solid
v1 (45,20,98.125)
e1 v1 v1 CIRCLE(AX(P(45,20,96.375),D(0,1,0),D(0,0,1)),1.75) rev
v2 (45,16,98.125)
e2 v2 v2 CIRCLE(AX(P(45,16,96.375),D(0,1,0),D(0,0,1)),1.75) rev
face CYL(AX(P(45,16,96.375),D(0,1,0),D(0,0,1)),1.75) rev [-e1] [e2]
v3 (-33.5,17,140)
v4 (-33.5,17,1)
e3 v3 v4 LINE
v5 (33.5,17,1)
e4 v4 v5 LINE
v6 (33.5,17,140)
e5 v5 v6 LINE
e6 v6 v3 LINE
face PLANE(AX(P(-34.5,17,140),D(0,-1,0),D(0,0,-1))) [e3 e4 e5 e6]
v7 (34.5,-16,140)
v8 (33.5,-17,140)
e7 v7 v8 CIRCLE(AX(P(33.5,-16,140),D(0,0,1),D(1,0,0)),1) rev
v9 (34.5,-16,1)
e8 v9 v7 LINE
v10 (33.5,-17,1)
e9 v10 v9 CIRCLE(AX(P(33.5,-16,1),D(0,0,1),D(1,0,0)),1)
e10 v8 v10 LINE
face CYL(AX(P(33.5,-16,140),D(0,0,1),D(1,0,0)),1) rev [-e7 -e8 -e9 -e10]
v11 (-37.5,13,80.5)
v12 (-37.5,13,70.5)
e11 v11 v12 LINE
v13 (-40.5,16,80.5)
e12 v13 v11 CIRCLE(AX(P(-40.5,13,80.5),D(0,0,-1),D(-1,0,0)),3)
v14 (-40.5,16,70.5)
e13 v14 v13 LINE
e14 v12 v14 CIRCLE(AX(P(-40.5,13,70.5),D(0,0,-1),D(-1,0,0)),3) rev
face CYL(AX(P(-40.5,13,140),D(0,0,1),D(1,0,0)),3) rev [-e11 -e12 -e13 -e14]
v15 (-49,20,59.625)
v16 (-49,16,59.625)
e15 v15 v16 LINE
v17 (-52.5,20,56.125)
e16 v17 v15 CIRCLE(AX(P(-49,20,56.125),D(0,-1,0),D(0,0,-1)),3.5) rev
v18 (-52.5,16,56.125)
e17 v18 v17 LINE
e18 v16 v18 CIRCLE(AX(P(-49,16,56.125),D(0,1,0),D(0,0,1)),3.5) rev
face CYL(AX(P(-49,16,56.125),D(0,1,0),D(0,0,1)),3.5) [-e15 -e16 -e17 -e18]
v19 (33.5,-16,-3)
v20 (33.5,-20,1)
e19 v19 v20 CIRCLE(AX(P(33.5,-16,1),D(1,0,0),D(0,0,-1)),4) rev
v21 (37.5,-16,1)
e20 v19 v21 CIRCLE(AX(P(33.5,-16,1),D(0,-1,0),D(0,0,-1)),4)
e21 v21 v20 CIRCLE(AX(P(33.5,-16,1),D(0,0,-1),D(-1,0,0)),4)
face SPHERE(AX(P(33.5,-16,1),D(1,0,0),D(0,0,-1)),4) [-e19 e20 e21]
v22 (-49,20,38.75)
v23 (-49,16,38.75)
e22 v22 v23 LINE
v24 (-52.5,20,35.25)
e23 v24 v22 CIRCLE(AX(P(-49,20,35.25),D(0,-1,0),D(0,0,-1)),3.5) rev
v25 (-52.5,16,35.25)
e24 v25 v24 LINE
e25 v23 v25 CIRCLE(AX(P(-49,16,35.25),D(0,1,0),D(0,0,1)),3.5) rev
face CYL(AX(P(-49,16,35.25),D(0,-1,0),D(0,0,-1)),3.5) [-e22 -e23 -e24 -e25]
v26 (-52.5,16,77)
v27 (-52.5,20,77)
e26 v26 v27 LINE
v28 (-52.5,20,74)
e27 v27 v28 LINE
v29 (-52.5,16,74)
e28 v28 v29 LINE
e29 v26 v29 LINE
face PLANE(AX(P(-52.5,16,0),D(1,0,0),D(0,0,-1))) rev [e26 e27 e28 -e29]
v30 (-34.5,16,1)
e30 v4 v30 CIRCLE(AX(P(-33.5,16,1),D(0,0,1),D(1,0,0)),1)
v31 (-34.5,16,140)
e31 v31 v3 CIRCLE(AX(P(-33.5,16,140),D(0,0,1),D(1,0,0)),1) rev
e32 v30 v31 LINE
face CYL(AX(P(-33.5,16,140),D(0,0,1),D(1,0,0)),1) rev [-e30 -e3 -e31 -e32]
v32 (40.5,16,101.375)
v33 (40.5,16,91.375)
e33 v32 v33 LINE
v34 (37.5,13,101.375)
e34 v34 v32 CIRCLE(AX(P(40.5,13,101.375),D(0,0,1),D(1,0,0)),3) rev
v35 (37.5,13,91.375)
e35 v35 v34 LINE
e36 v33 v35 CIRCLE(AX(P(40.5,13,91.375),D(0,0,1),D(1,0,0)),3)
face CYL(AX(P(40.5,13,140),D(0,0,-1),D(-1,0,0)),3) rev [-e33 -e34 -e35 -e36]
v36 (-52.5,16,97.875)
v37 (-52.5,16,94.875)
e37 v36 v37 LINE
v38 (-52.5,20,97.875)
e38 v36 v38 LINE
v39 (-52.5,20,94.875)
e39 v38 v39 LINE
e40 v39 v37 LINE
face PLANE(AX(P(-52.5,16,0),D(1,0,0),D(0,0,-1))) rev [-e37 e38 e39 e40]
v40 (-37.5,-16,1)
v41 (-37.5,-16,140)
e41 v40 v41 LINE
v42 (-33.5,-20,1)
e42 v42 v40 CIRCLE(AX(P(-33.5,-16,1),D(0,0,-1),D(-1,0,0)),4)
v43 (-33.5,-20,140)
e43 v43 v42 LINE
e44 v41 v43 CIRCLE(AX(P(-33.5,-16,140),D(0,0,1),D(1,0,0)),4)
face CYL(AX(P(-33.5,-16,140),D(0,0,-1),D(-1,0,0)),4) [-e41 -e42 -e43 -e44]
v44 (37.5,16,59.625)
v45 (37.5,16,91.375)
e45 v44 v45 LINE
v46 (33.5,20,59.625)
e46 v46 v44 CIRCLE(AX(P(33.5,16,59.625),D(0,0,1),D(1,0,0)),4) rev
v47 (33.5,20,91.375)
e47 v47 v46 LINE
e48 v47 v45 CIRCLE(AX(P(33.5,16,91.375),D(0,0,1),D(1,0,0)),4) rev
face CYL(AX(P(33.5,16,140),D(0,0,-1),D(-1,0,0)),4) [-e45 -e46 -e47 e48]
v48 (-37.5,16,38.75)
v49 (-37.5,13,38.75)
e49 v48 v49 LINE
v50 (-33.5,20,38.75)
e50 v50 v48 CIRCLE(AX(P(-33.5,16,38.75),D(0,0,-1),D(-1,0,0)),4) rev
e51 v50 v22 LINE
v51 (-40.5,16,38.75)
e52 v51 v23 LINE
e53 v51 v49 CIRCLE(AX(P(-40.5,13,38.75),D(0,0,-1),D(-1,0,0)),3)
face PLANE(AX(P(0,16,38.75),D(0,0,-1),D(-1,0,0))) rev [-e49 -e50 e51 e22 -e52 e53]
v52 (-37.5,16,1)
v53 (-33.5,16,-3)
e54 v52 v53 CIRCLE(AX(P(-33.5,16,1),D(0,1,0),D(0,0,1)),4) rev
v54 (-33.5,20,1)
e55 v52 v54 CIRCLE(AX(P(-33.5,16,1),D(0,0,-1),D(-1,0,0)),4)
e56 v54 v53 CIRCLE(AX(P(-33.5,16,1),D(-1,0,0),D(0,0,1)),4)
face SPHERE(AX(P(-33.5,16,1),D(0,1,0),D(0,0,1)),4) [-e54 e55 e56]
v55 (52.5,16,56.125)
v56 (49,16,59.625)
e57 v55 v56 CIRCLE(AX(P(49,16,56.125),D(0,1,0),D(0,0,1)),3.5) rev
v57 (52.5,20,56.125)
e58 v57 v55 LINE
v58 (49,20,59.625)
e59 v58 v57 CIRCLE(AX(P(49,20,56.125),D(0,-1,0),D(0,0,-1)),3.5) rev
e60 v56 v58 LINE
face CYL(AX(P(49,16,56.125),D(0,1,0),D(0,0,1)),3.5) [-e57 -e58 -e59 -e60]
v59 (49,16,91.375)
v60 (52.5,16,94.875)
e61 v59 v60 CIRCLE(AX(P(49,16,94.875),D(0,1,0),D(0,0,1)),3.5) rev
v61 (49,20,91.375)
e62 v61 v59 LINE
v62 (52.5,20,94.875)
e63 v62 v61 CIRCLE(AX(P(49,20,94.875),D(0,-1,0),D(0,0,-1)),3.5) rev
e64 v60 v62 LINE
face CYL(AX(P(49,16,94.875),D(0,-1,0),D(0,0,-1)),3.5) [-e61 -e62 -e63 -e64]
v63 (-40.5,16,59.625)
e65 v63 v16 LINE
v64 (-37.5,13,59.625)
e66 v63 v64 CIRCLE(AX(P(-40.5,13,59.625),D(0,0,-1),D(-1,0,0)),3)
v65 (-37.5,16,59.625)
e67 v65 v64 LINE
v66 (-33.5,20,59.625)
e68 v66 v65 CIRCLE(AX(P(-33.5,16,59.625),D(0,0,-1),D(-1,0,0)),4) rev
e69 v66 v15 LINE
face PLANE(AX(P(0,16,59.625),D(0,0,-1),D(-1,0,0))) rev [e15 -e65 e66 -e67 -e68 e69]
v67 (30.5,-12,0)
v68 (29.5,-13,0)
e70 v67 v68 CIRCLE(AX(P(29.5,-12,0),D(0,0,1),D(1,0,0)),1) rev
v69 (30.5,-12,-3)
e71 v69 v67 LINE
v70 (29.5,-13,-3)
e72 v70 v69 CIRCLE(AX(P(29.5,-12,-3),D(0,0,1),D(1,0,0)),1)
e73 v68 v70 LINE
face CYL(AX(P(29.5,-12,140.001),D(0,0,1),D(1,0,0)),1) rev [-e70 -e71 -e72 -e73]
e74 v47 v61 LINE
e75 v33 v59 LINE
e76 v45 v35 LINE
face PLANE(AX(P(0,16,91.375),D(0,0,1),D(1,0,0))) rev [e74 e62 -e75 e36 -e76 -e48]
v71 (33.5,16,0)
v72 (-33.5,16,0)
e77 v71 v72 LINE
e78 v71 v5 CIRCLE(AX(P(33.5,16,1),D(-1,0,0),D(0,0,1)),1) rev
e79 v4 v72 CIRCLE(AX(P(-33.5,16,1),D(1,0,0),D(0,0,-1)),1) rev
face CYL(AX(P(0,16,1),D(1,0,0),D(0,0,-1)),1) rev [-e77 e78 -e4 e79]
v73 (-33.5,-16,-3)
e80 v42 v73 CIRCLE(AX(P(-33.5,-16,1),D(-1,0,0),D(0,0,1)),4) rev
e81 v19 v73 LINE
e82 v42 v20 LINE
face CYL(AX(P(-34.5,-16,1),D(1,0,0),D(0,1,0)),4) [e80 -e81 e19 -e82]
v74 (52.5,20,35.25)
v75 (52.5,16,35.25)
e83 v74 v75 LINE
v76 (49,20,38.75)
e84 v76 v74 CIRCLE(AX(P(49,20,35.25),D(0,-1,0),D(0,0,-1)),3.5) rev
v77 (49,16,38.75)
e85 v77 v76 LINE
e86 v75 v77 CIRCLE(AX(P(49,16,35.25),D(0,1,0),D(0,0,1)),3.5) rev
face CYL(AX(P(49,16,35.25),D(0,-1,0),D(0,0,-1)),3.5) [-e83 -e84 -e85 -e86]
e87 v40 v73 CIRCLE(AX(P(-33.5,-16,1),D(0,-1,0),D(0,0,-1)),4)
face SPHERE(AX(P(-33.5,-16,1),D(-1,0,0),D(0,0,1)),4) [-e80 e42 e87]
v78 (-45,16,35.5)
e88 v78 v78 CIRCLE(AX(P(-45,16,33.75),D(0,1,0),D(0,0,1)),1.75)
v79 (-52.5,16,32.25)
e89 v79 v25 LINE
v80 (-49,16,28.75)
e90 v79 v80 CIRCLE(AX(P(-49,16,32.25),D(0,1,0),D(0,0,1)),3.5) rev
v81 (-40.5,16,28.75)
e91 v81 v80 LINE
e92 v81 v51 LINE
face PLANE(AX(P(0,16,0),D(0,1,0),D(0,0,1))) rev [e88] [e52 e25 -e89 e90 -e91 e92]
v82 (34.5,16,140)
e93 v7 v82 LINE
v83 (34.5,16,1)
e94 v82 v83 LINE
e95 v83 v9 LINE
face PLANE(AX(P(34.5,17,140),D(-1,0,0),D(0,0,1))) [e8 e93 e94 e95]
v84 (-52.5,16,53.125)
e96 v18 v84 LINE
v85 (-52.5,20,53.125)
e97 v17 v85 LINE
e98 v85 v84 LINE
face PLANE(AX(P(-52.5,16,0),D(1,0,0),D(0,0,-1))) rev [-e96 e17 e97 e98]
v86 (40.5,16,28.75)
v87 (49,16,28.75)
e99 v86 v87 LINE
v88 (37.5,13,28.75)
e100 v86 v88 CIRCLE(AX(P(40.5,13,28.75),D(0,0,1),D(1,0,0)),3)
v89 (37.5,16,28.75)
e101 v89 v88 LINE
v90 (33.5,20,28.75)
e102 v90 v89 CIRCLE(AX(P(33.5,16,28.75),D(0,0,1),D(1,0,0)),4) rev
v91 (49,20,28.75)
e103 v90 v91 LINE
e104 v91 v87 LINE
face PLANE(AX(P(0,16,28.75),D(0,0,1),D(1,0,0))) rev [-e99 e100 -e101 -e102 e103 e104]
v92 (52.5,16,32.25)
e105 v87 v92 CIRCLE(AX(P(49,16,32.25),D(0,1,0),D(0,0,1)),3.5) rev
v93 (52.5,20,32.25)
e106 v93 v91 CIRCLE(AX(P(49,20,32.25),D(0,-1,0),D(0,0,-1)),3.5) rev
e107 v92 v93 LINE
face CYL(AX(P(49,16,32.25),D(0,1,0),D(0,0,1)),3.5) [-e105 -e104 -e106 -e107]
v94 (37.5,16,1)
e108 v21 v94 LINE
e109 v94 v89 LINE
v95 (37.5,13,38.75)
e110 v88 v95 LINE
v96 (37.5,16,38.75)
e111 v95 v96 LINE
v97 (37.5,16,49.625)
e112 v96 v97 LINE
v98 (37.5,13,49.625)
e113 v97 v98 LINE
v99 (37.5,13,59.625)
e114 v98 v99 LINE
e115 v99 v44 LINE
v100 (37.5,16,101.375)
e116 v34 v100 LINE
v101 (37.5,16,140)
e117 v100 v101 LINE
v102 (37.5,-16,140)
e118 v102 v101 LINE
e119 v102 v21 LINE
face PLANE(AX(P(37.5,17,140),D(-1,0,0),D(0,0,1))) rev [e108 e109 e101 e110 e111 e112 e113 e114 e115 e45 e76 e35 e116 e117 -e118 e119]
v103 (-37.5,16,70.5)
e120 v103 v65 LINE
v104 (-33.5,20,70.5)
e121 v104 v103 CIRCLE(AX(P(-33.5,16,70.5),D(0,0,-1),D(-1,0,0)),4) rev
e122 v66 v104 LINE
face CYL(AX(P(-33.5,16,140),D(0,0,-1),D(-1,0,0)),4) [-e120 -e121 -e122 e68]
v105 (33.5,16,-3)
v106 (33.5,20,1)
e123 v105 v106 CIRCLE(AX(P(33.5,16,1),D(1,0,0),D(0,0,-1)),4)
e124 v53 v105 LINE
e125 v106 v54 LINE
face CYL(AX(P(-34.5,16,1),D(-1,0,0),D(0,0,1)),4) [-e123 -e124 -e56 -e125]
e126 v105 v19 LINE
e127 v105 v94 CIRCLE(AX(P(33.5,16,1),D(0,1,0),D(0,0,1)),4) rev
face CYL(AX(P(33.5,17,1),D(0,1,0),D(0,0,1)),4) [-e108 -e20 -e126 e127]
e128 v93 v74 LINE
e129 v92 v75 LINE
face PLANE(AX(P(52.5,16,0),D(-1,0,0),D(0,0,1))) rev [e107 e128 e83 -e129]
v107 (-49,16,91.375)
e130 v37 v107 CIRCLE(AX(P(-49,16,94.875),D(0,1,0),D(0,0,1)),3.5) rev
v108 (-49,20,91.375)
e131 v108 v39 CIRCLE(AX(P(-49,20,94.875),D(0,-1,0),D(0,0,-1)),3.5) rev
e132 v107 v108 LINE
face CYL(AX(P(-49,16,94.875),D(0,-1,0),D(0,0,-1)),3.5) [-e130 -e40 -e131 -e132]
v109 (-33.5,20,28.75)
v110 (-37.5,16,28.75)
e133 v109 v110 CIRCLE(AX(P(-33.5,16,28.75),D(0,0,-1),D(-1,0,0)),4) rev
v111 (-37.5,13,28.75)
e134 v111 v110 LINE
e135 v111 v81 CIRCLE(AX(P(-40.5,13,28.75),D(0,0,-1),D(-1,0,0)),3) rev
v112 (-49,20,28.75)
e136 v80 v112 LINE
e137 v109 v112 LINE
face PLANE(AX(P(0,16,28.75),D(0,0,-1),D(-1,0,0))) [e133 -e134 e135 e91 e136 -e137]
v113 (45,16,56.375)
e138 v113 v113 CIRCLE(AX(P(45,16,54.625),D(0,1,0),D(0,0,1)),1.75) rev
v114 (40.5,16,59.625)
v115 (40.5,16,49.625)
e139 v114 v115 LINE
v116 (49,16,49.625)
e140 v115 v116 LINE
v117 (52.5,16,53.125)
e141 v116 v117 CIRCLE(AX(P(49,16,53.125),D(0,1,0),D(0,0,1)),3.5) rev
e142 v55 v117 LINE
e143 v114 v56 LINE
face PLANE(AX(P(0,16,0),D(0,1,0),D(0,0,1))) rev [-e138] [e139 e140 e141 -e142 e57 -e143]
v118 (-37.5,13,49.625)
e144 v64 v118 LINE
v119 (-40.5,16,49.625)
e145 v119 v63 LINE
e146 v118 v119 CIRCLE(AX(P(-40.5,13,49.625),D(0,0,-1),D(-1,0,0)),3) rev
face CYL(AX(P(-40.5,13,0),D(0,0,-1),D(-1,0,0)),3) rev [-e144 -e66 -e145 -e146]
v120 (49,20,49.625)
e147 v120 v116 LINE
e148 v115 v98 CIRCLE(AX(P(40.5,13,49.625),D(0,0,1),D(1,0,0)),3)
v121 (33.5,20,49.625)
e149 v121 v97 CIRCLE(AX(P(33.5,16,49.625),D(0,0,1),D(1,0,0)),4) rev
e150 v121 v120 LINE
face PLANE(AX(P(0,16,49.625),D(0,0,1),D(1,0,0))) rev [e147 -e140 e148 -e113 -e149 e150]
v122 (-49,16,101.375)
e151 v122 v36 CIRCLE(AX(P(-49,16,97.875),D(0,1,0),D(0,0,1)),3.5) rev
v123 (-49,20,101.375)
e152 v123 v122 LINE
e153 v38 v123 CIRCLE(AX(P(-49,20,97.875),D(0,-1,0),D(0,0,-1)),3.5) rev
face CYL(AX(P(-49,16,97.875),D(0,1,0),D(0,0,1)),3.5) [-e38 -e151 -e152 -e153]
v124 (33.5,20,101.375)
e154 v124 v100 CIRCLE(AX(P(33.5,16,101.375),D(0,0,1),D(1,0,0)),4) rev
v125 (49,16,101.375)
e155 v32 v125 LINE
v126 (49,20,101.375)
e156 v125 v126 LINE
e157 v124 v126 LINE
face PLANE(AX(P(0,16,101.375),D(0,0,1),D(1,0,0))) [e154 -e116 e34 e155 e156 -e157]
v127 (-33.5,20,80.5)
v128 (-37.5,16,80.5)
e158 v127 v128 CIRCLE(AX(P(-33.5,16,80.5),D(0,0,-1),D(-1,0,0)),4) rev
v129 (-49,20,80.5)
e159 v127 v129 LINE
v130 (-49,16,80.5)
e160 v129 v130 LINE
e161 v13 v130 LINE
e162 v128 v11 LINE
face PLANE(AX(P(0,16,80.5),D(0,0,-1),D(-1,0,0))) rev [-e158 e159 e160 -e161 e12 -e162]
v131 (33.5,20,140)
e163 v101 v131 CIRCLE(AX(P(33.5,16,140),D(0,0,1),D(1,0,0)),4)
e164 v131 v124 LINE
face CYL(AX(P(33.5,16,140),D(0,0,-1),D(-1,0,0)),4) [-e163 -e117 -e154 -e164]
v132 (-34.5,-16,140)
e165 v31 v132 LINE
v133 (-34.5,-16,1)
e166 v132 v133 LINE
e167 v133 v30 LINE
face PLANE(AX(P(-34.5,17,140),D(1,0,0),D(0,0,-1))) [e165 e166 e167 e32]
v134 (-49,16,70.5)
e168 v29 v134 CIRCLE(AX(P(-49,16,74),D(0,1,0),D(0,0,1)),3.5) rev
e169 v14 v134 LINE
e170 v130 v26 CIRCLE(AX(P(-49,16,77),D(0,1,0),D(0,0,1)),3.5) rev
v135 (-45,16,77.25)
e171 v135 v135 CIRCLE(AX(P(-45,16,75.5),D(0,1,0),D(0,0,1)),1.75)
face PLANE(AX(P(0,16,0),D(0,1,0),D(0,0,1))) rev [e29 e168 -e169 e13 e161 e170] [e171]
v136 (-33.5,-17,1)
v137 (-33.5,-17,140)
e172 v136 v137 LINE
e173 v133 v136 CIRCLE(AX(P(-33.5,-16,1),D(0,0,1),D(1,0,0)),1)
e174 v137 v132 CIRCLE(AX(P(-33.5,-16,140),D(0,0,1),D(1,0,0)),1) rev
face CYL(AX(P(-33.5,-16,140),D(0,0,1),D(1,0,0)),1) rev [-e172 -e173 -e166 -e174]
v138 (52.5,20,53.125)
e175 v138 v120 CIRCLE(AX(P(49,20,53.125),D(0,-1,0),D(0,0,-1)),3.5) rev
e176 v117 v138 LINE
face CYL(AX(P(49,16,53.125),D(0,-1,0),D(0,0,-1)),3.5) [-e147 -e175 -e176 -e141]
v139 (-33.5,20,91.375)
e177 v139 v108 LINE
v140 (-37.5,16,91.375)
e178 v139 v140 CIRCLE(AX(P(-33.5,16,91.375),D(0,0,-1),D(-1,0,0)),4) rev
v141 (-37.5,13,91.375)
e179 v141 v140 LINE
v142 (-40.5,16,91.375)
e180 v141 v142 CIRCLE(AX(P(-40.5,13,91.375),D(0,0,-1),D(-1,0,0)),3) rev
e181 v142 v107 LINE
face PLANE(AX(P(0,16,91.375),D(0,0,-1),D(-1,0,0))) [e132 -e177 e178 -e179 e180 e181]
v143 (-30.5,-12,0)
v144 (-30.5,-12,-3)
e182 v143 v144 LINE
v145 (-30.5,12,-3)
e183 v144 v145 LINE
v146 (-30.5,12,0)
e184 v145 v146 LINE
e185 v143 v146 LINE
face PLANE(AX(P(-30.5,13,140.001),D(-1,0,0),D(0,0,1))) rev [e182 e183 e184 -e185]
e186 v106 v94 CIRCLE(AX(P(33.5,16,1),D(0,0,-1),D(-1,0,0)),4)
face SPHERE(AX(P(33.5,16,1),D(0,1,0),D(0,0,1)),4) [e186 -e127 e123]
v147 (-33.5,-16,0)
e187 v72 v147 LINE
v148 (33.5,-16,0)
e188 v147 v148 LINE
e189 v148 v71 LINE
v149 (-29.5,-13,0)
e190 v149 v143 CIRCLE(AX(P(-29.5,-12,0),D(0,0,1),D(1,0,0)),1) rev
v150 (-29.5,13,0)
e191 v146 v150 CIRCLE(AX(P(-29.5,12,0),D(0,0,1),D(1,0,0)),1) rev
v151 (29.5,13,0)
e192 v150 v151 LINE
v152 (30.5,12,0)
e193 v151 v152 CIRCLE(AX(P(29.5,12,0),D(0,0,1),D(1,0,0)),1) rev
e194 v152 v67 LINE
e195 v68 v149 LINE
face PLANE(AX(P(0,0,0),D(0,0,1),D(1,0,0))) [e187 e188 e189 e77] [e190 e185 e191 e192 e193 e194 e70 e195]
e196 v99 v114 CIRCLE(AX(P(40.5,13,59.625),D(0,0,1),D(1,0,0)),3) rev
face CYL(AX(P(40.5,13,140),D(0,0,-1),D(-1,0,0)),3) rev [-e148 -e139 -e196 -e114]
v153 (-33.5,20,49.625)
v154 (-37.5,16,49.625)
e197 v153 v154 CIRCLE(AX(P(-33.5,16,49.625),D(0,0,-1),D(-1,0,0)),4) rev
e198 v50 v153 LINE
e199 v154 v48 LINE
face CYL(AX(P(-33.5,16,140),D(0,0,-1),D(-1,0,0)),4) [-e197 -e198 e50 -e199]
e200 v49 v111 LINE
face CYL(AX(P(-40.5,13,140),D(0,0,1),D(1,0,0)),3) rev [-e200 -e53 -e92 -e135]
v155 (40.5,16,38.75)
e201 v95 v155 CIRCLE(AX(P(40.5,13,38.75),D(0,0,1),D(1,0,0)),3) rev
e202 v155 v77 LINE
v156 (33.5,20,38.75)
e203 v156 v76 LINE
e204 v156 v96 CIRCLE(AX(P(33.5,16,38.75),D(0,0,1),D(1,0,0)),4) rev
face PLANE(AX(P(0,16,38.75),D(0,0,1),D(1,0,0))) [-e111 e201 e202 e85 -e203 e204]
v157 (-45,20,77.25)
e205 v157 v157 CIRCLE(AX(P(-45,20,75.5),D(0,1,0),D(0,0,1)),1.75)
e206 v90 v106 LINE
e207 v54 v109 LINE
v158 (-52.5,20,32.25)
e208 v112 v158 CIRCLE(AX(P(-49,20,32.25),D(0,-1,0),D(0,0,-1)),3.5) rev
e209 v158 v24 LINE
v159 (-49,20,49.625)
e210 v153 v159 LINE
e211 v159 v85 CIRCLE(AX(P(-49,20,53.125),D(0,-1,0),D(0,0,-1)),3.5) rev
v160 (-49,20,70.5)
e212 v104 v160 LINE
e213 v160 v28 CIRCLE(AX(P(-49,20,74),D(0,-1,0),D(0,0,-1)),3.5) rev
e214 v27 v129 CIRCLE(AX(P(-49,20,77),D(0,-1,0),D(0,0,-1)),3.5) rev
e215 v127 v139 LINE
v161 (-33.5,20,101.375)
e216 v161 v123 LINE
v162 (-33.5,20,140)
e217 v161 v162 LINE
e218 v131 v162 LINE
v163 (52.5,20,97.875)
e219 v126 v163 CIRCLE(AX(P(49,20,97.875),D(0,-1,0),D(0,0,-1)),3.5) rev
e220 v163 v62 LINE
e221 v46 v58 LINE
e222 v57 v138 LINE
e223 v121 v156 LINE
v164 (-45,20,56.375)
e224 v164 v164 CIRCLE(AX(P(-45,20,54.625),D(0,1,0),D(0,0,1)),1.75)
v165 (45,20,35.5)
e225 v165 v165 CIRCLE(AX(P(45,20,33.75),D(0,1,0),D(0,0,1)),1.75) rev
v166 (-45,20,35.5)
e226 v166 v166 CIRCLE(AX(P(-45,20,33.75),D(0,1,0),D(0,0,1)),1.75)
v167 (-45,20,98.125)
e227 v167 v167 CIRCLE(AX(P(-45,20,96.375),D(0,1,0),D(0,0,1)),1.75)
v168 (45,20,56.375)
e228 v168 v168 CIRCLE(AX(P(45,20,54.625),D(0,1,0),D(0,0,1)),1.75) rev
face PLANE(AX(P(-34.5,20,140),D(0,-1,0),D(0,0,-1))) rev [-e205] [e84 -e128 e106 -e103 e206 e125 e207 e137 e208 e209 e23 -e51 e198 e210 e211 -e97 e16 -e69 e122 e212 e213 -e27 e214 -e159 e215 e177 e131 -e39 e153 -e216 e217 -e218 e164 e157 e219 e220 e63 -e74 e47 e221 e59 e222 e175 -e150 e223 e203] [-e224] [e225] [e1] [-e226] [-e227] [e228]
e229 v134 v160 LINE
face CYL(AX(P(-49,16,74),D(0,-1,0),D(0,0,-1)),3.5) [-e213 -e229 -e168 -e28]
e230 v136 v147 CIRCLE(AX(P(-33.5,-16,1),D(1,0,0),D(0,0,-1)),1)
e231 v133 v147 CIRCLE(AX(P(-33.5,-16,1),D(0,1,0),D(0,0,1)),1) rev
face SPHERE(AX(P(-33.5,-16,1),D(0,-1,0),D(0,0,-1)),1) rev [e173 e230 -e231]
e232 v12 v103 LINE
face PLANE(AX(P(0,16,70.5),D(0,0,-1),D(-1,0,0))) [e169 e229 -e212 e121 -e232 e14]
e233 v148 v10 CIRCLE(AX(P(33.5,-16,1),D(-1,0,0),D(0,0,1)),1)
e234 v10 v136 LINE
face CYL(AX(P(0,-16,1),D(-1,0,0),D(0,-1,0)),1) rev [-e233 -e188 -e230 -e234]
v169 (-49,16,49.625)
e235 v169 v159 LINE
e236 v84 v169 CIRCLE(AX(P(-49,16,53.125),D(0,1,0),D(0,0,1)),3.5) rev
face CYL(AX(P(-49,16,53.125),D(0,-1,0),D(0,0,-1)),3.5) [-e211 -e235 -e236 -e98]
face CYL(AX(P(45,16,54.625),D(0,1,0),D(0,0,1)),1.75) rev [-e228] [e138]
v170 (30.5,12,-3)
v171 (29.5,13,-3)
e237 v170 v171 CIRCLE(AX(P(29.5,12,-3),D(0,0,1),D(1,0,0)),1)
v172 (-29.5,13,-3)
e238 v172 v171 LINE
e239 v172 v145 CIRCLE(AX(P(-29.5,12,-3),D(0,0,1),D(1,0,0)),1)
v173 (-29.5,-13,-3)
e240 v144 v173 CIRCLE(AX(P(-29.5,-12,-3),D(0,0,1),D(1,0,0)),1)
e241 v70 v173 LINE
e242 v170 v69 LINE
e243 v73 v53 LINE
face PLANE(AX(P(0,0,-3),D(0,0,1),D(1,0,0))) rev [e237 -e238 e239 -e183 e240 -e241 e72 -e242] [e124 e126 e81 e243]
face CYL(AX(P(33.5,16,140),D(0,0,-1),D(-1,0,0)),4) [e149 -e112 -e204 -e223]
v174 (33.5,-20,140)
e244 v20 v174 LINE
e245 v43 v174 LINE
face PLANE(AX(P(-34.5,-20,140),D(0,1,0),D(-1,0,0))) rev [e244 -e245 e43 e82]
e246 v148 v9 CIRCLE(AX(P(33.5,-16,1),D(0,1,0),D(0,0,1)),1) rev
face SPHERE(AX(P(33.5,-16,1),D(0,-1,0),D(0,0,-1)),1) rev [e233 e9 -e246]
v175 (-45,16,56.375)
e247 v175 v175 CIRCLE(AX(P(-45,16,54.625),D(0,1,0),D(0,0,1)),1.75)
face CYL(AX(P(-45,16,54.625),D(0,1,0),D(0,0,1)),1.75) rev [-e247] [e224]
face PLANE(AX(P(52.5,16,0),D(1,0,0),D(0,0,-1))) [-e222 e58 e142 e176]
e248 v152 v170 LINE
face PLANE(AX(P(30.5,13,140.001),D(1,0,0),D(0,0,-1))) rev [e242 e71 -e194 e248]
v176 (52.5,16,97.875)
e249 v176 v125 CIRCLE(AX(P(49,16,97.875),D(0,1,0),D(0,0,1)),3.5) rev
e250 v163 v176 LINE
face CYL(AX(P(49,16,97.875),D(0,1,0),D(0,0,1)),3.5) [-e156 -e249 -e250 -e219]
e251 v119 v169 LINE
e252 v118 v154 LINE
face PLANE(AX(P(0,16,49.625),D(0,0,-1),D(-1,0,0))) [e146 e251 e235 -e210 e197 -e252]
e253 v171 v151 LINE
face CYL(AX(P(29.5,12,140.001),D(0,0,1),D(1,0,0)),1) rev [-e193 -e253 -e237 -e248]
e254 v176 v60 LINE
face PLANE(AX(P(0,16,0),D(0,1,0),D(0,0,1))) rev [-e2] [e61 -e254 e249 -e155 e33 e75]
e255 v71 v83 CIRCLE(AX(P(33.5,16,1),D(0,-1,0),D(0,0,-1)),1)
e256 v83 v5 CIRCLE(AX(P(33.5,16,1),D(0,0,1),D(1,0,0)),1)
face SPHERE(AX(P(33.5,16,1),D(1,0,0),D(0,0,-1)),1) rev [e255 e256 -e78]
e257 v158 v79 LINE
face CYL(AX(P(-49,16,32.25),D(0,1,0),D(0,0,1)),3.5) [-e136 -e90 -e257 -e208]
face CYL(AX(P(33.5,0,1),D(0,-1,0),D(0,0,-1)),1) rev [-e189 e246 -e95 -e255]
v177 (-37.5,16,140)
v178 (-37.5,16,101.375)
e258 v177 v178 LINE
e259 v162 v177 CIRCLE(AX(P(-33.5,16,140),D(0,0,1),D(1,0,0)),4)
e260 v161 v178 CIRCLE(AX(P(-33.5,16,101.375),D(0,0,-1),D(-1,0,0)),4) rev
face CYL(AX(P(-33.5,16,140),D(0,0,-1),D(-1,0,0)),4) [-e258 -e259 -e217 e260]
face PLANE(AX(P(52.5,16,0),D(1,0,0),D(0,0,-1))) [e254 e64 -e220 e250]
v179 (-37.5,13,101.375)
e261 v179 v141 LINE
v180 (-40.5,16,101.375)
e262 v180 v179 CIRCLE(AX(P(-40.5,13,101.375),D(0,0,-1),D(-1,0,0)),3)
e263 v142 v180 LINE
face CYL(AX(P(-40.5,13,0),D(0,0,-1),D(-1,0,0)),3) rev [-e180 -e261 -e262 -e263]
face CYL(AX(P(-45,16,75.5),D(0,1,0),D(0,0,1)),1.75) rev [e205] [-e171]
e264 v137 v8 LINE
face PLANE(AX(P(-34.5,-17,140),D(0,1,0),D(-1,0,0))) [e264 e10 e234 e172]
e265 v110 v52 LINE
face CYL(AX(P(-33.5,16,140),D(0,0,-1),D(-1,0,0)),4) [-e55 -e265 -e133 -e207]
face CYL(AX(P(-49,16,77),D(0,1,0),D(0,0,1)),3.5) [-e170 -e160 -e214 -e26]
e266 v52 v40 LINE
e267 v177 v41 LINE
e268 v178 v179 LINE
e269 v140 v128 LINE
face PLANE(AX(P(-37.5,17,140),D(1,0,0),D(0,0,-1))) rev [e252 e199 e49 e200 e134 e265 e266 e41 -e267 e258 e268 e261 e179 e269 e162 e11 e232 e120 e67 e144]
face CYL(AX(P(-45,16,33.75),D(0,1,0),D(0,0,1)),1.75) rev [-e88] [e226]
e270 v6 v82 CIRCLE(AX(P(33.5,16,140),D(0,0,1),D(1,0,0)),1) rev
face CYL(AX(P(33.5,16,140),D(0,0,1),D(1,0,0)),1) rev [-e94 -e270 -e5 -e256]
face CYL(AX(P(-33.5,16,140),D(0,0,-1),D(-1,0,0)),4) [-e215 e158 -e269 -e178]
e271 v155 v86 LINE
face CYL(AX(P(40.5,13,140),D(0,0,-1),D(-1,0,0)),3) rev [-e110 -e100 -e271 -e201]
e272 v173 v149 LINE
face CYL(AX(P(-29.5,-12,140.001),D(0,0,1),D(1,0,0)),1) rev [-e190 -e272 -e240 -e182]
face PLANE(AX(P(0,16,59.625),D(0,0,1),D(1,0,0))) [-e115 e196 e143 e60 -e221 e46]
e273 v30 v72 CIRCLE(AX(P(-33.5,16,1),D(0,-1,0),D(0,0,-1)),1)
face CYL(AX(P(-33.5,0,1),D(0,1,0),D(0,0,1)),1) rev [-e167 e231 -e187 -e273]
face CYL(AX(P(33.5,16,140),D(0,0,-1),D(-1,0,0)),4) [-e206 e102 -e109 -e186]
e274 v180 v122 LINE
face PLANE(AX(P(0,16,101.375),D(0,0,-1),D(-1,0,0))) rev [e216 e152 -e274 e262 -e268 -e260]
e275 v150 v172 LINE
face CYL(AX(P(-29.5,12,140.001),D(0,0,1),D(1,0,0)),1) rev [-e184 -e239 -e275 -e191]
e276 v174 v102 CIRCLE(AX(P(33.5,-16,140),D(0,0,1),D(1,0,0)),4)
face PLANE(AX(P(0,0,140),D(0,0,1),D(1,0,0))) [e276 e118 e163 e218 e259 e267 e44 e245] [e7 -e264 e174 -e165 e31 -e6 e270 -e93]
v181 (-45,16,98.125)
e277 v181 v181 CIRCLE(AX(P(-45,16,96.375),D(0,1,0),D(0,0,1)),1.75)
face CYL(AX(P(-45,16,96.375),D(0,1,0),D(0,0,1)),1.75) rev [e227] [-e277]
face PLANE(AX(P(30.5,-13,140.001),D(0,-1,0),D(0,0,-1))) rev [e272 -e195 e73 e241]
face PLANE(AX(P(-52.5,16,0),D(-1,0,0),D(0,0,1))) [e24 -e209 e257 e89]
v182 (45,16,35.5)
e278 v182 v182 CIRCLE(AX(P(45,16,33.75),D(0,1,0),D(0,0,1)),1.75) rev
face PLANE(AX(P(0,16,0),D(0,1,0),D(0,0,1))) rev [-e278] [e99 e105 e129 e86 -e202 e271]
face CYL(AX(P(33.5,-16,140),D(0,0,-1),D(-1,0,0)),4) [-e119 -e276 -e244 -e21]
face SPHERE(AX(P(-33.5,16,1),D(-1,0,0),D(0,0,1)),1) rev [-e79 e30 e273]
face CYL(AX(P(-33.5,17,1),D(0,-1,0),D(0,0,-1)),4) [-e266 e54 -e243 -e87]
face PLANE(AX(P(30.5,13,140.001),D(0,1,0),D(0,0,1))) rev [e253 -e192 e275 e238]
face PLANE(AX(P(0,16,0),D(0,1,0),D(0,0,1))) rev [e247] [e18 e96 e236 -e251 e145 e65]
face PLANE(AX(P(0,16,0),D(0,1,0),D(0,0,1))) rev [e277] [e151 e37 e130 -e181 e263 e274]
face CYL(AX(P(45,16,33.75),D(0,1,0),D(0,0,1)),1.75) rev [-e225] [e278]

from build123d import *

# Parameters (mm, degrees)
ESQUISSE1_W             = 69
ESQUISSE1_H             = 34
BOSS_EXTRU_1_DEPTH      = 140
COQUE1_T                = 3
CONG_3_R                = 4
ESQUISSE2_W             = 19
ESQUISSE2_H             = 10
ESQUISSE2_R             = 1.75
BOSS_EXTRU_2_DEPTH      = 4
CONG_5_R                = 3.5
ESQUISSE1_2_W           = 69
ESQUISSE1_2_H           = 34
ENL_V_MAT_EXTRU_1_DEPTH = 140
CONG_4_R                = 1
CONG_7_R                = 3
ENL_V_MAT_EXTRU_2_REACH = 155.64
ESQUISSE3_W             = 61
ESQUISSE3_H             = 26
CONG_8_R                = 1


with BuildPart() as part:
    # Esquisse1 → Boss.-Extru.1 (new body)
    with BuildSketch(Plane.XY):
        Rectangle(ESQUISSE1_W, ESQUISSE1_H)
    extrude(amount=BOSS_EXTRU_1_DEPTH)

    # Coque1
    coque1_openings = [part.faces().sort_by_distance(p)[0] for p in [
        (0, 0, 140),
    ]]
    offset(amount=COQUE1_T, openings=coque1_openings, kind=Kind.INTERSECTION)

    # Congé3
    # the kernel refuses this fillet: 4 mm, written as the material it takes off along each edge
    with BuildSketch(Plane(origin=(33.5, 16, 1), x_dir=(0, 1, 0), z_dir=(0, 0, -1))) as cong_3_piece_1_section:
        Polygon((0, 0), (CONG_3_R, 0), (CONG_3_R, CONG_3_R), (0, CONG_3_R), align=None)
    cong_3_piece_1 = extrude(amount=CONG_3_R, mode=Mode.PRIVATE)
    cong_3_piece_1 = cong_3_piece_1 - Plane(origin=(33.5, 16, 1), x_dir=(-0.7071067811865475, -0.7071067811865475, 0), z_dir=(0, 0, -1)) * Sphere(CONG_3_R, mode=Mode.PRIVATE)
    add(cong_3_piece_1, mode=Mode.SUBTRACT)
    with BuildSketch(Plane(origin=(-33.5, 16, 1), x_dir=(0, 0, -1), z_dir=(-1, 0, 0))) as cong_3_piece_2_section:
        Polygon((0, 0), (CONG_3_R, 0), (CONG_3_R, -CONG_3_R), (0, -CONG_3_R), align=None)
    cong_3_piece_2 = extrude(amount=CONG_3_R, mode=Mode.PRIVATE)
    cong_3_piece_2 = cong_3_piece_2 - Plane(origin=(-33.5, 16, 1), x_dir=(0, -0.7071067811865475, 0.7071067811865475), z_dir=(-1, 0, 0)) * Sphere(CONG_3_R, mode=Mode.PRIVATE)
    add(cong_3_piece_2, mode=Mode.SUBTRACT)
    with BuildSketch(Plane(origin=(33.5, -16, 1), x_dir=(0, 0, -1), z_dir=(0, -1, 0))) as cong_3_piece_3_section:
        Polygon((0, 0), (CONG_3_R, 0), (CONG_3_R, CONG_3_R), (0, CONG_3_R), align=None)
    cong_3_piece_3 = extrude(amount=CONG_3_R, mode=Mode.PRIVATE)
    cong_3_piece_3 = cong_3_piece_3 - Plane(origin=(33.5, -16, 1), x_dir=(-0.7071067811865475, 0, 0.7071067811865475), z_dir=(0, -1, 0)) * Sphere(CONG_3_R, mode=Mode.PRIVATE)
    add(cong_3_piece_3, mode=Mode.SUBTRACT)
    with BuildSketch(Plane(origin=(-33.5, -16, 1), x_dir=(-1, 0, 0), z_dir=(0, -1, 0))) as cong_3_piece_4_section:
        Polygon((0, 0), (CONG_3_R, 0), (CONG_3_R, CONG_3_R), (0, CONG_3_R), align=None)
    cong_3_piece_4 = extrude(amount=CONG_3_R, mode=Mode.PRIVATE)
    cong_3_piece_4 = cong_3_piece_4 - Plane(origin=(-33.5, -16, 1), x_dir=(0.7071067811865475, 0, 0.7071067811865475), z_dir=(0, -1, 0)) * Sphere(CONG_3_R, mode=Mode.PRIVATE)
    add(cong_3_piece_4, mode=Mode.SUBTRACT)
    with BuildSketch(Plane(origin=(33.5, 20, -3), x_dir=(0, 0, 1), z_dir=(-1, 0, 0)), Plane(origin=(-33.5, -20, -3), x_dir=(0, 0, 1), z_dir=(1, 0, 0))) as cong_3_piece_5:
        with BuildLine():
            CenterArc((CONG_3_R, -CONG_3_R), CONG_3_R, 90, 90)
            Line((0, -CONG_3_R), (0, 0))
            Line((0, 0), (CONG_3_R, 0))
        make_face()
    extrude(amount=67, mode=Mode.SUBTRACT)
    with BuildSketch(Plane(origin=(37.5, -16, -3), x_dir=(0, 0, 1), z_dir=(0, 1, 0)), Plane(origin=(-37.5, 16, -3), x_dir=(0, 0, 1), z_dir=(0, -1, 0))) as cong_3_piece_6:
        with BuildLine():
            CenterArc((CONG_3_R, -CONG_3_R), CONG_3_R, 90, 90)
            Line((0, -CONG_3_R), (0, 0))
            Line((0, 0), (CONG_3_R, 0))
        make_face()
    extrude(amount=32, mode=Mode.SUBTRACT)
    with BuildSketch(Plane(origin=(-37.5, 20, 1), x_dir=(1, 0, 0), z_dir=(0, 0, 1)), Plane(origin=(37.5, 20, 150), x_dir=(-1, 0, 0), z_dir=(0, 0, -1)), Plane(origin=(37.5, -20, 150), x_dir=(0, 1, 0), z_dir=(0, 0, -1)), Plane(origin=(-37.5, -20, 150), x_dir=(1, 0, 0), z_dir=(0, 0, -1))) as cong_3_piece_7:
        with BuildLine():
            CenterArc((CONG_3_R, -CONG_3_R), CONG_3_R, 90, 90)
            Line((0, -CONG_3_R), (0, 0))
            Line((0, 0), (CONG_3_R, 0))
        make_face()
    extrude(amount=149, mode=Mode.SUBTRACT)

    # Esquisse2 → Boss.-Extru.2 (add)
    # profile 1 of 7: a face of its own
    with BuildSketch(Plane(origin=(0, 20, 0), x_dir=(1, 0, 0), z_dir=(0, 1, 0))):
        with Locations((-43, -33.75)):
            Rectangle(ESQUISSE2_W, ESQUISSE2_H)
        with Locations(Location((-45, -33.75, 0), (0, 0, 270))):
            Circle(ESQUISSE2_R, mode=Mode.SUBTRACT)
    # profile 2 of 7: a face of its own
    with BuildSketch(Plane(origin=(0, 20, 0), x_dir=(1, 0, 0), z_dir=(0, 1, 0))):
        with Locations((-43, -54.625)):
            Rectangle(ESQUISSE2_W, ESQUISSE2_H)
        with Locations(Location((-45, -54.625, 0), (0, 0, 270))):
            Circle(ESQUISSE2_R, mode=Mode.SUBTRACT)
    # profile 3 of 7: a face of its own
    with BuildSketch(Plane(origin=(0, 20, 0), x_dir=(1, 0, 0), z_dir=(0, 1, 0))):
        with Locations((43, -33.75)):
            Rectangle(ESQUISSE2_W, ESQUISSE2_H)
        with Locations(Location((45, -33.75, 0), (0, 0, 270))):
            Circle(ESQUISSE2_R, mode=Mode.SUBTRACT)
    # profile 4 of 7: a face of its own
    with BuildSketch(Plane(origin=(0, 20, 0), x_dir=(1, 0, 0), z_dir=(0, 1, 0))):
        with Locations((-43, -75.5)):
            Rectangle(ESQUISSE2_W, ESQUISSE2_H)
        with Locations(Location((-45, -75.5, 0), (0, 0, 270))):
            Circle(ESQUISSE2_R, mode=Mode.SUBTRACT)
    # profile 5 of 7: a face of its own
    with BuildSketch(Plane(origin=(0, 20, 0), x_dir=(1, 0, 0), z_dir=(0, 1, 0))):
        with Locations((43, -54.625)):
            Rectangle(ESQUISSE2_W, ESQUISSE2_H)
        with Locations(Location((45, -54.625, 0), (0, 0, 270))):
            Circle(ESQUISSE2_R, mode=Mode.SUBTRACT)
    # profile 6 of 7: a face of its own
    with BuildSketch(Plane(origin=(0, 20, 0), x_dir=(1, 0, 0), z_dir=(0, 1, 0))):
        with Locations((-43, -96.375)):
            Rectangle(ESQUISSE2_W, ESQUISSE2_H)
        with Locations(Location((-45, -96.375, 0), (0, 0, 270))):
            Circle(ESQUISSE2_R, mode=Mode.SUBTRACT)
    # profile 7 of 7: a face of its own
    with BuildSketch(Plane(origin=(0, 20, 0), x_dir=(1, 0, 0), z_dir=(0, 1, 0))):
        with Locations((43, -96.375)):
            Rectangle(ESQUISSE2_W, ESQUISSE2_H)
        with Locations(Location((45, -96.375, 0), (0, 0, 270))):
            Circle(ESQUISSE2_R, mode=Mode.SUBTRACT)
    extrude(amount=-BOSS_EXTRU_2_DEPTH)

    # Congé5
    cong_5_edges = [part.edges().sort_by_distance(p)[0] for p in [
        (52.5, 18, 28.75),
        (52.5, 18, 38.75),
        (52.5, 18, 49.625),
        (52.5, 18, 59.625),
        (-52.5, 18, 91.375),
        (-52.5, 18, 101.375),
        (-52.5, 18, 80.5),
        (-52.5, 18, 70.5),
        (52.5, 18, 91.375),
        (52.5, 18, 101.375),
        (-52.5, 18, 28.75),
        (-52.5, 18, 38.75),
        (-52.5, 18, 49.625),
        (-52.5, 18, 59.625),
    ]]
    fillet(cong_5_edges, radius=CONG_5_R)

    # Esquisse1<2> → Enlèv. mat.-Extru.1 (cut)
    with BuildSketch(Plane.XY):
        Rectangle(ESQUISSE1_2_W, ESQUISSE1_2_H)
    extrude(amount=ENL_V_MAT_EXTRU_1_DEPTH, mode=Mode.SUBTRACT)

    # Congé4
    cong_4_edges = [part.edges().sort_by_distance(p)[0] for p in [
        (-34.5, 0, 0),
        (-34.5, 17, 70),
        (0, -17, 0),
        (-34.5, -17, 70),
        (34.5, 0, 0),
        (34.5, -17, 70),
        (0, 17, 0),
        (34.5, 17, 70),
    ]]
    fillet(cong_4_edges, radius=CONG_4_R)

    # Congé7
    # the kernel refuses this fillet: 3 mm, written as the material it adds along each edge
    with BuildSketch(Plane(origin=(37.5, 16, 38.75), x_dir=(0, -1, 0), z_dir=(0, 0, -1)), Plane(origin=(37.5, 16, 59.625), x_dir=(0, -1, 0), z_dir=(0, 0, -1)), Plane(origin=(-37.5, 16, 91.375), x_dir=(0, -1, 0), z_dir=(0, 0, 1)), Plane(origin=(-37.5, 16, 70.5), x_dir=(0, -1, 0), z_dir=(0, 0, 1)), Plane(origin=(37.5, 16, 101.375), x_dir=(0, -1, 0), z_dir=(0, 0, -1)), Plane(origin=(-37.5, 16, 28.75), x_dir=(0, -1, 0), z_dir=(0, 0, 1)), Plane(origin=(-37.5, 16, 49.625), x_dir=(0, -1, 0), z_dir=(0, 0, 1))) as cong_7_piece_1:
        with BuildLine():
            CenterArc((CONG_7_R, -CONG_7_R), CONG_7_R, 90, 90)
            Line((0, -CONG_7_R), (0, 0))
            Line((0, 0), (CONG_7_R, 0))
        make_face()
    extrude(amount=10)

    # Esquisse3 → Enlèv. mat.-Extru.2 (cut, up to next)
    with BuildSketch(Plane(origin=(0, 0, -3), x_dir=(-1, 0, 0), z_dir=(0, 0, -1)), mode=Mode.PRIVATE) as enl_v_mat_extru_2_sk1:
        Rectangle(ESQUISSE3_W, ESQUISSE3_H)
    enl_v_mat_extru_2_tool1 = extrude(enl_v_mat_extru_2_sk1.sketch, amount=-ENL_V_MAT_EXTRU_2_REACH, mode=Mode.PRIVATE) & part.part
    add(enl_v_mat_extru_2_tool1.solids().sort_by_distance((0, 0, -3))[0], mode=Mode.SUBTRACT)

    # Congé8
    cong_8_edges = [part.edges().sort_by_distance(p)[0] for p in [
        (30.5, -13, -1.5),
        (30.5, 13, -1.5),
        (-30.5, 13, -1.5),
        (-30.5, -13, -1.5),
    ]]
    fillet(cong_8_edges, radius=CONG_8_R)


solid = part.part
